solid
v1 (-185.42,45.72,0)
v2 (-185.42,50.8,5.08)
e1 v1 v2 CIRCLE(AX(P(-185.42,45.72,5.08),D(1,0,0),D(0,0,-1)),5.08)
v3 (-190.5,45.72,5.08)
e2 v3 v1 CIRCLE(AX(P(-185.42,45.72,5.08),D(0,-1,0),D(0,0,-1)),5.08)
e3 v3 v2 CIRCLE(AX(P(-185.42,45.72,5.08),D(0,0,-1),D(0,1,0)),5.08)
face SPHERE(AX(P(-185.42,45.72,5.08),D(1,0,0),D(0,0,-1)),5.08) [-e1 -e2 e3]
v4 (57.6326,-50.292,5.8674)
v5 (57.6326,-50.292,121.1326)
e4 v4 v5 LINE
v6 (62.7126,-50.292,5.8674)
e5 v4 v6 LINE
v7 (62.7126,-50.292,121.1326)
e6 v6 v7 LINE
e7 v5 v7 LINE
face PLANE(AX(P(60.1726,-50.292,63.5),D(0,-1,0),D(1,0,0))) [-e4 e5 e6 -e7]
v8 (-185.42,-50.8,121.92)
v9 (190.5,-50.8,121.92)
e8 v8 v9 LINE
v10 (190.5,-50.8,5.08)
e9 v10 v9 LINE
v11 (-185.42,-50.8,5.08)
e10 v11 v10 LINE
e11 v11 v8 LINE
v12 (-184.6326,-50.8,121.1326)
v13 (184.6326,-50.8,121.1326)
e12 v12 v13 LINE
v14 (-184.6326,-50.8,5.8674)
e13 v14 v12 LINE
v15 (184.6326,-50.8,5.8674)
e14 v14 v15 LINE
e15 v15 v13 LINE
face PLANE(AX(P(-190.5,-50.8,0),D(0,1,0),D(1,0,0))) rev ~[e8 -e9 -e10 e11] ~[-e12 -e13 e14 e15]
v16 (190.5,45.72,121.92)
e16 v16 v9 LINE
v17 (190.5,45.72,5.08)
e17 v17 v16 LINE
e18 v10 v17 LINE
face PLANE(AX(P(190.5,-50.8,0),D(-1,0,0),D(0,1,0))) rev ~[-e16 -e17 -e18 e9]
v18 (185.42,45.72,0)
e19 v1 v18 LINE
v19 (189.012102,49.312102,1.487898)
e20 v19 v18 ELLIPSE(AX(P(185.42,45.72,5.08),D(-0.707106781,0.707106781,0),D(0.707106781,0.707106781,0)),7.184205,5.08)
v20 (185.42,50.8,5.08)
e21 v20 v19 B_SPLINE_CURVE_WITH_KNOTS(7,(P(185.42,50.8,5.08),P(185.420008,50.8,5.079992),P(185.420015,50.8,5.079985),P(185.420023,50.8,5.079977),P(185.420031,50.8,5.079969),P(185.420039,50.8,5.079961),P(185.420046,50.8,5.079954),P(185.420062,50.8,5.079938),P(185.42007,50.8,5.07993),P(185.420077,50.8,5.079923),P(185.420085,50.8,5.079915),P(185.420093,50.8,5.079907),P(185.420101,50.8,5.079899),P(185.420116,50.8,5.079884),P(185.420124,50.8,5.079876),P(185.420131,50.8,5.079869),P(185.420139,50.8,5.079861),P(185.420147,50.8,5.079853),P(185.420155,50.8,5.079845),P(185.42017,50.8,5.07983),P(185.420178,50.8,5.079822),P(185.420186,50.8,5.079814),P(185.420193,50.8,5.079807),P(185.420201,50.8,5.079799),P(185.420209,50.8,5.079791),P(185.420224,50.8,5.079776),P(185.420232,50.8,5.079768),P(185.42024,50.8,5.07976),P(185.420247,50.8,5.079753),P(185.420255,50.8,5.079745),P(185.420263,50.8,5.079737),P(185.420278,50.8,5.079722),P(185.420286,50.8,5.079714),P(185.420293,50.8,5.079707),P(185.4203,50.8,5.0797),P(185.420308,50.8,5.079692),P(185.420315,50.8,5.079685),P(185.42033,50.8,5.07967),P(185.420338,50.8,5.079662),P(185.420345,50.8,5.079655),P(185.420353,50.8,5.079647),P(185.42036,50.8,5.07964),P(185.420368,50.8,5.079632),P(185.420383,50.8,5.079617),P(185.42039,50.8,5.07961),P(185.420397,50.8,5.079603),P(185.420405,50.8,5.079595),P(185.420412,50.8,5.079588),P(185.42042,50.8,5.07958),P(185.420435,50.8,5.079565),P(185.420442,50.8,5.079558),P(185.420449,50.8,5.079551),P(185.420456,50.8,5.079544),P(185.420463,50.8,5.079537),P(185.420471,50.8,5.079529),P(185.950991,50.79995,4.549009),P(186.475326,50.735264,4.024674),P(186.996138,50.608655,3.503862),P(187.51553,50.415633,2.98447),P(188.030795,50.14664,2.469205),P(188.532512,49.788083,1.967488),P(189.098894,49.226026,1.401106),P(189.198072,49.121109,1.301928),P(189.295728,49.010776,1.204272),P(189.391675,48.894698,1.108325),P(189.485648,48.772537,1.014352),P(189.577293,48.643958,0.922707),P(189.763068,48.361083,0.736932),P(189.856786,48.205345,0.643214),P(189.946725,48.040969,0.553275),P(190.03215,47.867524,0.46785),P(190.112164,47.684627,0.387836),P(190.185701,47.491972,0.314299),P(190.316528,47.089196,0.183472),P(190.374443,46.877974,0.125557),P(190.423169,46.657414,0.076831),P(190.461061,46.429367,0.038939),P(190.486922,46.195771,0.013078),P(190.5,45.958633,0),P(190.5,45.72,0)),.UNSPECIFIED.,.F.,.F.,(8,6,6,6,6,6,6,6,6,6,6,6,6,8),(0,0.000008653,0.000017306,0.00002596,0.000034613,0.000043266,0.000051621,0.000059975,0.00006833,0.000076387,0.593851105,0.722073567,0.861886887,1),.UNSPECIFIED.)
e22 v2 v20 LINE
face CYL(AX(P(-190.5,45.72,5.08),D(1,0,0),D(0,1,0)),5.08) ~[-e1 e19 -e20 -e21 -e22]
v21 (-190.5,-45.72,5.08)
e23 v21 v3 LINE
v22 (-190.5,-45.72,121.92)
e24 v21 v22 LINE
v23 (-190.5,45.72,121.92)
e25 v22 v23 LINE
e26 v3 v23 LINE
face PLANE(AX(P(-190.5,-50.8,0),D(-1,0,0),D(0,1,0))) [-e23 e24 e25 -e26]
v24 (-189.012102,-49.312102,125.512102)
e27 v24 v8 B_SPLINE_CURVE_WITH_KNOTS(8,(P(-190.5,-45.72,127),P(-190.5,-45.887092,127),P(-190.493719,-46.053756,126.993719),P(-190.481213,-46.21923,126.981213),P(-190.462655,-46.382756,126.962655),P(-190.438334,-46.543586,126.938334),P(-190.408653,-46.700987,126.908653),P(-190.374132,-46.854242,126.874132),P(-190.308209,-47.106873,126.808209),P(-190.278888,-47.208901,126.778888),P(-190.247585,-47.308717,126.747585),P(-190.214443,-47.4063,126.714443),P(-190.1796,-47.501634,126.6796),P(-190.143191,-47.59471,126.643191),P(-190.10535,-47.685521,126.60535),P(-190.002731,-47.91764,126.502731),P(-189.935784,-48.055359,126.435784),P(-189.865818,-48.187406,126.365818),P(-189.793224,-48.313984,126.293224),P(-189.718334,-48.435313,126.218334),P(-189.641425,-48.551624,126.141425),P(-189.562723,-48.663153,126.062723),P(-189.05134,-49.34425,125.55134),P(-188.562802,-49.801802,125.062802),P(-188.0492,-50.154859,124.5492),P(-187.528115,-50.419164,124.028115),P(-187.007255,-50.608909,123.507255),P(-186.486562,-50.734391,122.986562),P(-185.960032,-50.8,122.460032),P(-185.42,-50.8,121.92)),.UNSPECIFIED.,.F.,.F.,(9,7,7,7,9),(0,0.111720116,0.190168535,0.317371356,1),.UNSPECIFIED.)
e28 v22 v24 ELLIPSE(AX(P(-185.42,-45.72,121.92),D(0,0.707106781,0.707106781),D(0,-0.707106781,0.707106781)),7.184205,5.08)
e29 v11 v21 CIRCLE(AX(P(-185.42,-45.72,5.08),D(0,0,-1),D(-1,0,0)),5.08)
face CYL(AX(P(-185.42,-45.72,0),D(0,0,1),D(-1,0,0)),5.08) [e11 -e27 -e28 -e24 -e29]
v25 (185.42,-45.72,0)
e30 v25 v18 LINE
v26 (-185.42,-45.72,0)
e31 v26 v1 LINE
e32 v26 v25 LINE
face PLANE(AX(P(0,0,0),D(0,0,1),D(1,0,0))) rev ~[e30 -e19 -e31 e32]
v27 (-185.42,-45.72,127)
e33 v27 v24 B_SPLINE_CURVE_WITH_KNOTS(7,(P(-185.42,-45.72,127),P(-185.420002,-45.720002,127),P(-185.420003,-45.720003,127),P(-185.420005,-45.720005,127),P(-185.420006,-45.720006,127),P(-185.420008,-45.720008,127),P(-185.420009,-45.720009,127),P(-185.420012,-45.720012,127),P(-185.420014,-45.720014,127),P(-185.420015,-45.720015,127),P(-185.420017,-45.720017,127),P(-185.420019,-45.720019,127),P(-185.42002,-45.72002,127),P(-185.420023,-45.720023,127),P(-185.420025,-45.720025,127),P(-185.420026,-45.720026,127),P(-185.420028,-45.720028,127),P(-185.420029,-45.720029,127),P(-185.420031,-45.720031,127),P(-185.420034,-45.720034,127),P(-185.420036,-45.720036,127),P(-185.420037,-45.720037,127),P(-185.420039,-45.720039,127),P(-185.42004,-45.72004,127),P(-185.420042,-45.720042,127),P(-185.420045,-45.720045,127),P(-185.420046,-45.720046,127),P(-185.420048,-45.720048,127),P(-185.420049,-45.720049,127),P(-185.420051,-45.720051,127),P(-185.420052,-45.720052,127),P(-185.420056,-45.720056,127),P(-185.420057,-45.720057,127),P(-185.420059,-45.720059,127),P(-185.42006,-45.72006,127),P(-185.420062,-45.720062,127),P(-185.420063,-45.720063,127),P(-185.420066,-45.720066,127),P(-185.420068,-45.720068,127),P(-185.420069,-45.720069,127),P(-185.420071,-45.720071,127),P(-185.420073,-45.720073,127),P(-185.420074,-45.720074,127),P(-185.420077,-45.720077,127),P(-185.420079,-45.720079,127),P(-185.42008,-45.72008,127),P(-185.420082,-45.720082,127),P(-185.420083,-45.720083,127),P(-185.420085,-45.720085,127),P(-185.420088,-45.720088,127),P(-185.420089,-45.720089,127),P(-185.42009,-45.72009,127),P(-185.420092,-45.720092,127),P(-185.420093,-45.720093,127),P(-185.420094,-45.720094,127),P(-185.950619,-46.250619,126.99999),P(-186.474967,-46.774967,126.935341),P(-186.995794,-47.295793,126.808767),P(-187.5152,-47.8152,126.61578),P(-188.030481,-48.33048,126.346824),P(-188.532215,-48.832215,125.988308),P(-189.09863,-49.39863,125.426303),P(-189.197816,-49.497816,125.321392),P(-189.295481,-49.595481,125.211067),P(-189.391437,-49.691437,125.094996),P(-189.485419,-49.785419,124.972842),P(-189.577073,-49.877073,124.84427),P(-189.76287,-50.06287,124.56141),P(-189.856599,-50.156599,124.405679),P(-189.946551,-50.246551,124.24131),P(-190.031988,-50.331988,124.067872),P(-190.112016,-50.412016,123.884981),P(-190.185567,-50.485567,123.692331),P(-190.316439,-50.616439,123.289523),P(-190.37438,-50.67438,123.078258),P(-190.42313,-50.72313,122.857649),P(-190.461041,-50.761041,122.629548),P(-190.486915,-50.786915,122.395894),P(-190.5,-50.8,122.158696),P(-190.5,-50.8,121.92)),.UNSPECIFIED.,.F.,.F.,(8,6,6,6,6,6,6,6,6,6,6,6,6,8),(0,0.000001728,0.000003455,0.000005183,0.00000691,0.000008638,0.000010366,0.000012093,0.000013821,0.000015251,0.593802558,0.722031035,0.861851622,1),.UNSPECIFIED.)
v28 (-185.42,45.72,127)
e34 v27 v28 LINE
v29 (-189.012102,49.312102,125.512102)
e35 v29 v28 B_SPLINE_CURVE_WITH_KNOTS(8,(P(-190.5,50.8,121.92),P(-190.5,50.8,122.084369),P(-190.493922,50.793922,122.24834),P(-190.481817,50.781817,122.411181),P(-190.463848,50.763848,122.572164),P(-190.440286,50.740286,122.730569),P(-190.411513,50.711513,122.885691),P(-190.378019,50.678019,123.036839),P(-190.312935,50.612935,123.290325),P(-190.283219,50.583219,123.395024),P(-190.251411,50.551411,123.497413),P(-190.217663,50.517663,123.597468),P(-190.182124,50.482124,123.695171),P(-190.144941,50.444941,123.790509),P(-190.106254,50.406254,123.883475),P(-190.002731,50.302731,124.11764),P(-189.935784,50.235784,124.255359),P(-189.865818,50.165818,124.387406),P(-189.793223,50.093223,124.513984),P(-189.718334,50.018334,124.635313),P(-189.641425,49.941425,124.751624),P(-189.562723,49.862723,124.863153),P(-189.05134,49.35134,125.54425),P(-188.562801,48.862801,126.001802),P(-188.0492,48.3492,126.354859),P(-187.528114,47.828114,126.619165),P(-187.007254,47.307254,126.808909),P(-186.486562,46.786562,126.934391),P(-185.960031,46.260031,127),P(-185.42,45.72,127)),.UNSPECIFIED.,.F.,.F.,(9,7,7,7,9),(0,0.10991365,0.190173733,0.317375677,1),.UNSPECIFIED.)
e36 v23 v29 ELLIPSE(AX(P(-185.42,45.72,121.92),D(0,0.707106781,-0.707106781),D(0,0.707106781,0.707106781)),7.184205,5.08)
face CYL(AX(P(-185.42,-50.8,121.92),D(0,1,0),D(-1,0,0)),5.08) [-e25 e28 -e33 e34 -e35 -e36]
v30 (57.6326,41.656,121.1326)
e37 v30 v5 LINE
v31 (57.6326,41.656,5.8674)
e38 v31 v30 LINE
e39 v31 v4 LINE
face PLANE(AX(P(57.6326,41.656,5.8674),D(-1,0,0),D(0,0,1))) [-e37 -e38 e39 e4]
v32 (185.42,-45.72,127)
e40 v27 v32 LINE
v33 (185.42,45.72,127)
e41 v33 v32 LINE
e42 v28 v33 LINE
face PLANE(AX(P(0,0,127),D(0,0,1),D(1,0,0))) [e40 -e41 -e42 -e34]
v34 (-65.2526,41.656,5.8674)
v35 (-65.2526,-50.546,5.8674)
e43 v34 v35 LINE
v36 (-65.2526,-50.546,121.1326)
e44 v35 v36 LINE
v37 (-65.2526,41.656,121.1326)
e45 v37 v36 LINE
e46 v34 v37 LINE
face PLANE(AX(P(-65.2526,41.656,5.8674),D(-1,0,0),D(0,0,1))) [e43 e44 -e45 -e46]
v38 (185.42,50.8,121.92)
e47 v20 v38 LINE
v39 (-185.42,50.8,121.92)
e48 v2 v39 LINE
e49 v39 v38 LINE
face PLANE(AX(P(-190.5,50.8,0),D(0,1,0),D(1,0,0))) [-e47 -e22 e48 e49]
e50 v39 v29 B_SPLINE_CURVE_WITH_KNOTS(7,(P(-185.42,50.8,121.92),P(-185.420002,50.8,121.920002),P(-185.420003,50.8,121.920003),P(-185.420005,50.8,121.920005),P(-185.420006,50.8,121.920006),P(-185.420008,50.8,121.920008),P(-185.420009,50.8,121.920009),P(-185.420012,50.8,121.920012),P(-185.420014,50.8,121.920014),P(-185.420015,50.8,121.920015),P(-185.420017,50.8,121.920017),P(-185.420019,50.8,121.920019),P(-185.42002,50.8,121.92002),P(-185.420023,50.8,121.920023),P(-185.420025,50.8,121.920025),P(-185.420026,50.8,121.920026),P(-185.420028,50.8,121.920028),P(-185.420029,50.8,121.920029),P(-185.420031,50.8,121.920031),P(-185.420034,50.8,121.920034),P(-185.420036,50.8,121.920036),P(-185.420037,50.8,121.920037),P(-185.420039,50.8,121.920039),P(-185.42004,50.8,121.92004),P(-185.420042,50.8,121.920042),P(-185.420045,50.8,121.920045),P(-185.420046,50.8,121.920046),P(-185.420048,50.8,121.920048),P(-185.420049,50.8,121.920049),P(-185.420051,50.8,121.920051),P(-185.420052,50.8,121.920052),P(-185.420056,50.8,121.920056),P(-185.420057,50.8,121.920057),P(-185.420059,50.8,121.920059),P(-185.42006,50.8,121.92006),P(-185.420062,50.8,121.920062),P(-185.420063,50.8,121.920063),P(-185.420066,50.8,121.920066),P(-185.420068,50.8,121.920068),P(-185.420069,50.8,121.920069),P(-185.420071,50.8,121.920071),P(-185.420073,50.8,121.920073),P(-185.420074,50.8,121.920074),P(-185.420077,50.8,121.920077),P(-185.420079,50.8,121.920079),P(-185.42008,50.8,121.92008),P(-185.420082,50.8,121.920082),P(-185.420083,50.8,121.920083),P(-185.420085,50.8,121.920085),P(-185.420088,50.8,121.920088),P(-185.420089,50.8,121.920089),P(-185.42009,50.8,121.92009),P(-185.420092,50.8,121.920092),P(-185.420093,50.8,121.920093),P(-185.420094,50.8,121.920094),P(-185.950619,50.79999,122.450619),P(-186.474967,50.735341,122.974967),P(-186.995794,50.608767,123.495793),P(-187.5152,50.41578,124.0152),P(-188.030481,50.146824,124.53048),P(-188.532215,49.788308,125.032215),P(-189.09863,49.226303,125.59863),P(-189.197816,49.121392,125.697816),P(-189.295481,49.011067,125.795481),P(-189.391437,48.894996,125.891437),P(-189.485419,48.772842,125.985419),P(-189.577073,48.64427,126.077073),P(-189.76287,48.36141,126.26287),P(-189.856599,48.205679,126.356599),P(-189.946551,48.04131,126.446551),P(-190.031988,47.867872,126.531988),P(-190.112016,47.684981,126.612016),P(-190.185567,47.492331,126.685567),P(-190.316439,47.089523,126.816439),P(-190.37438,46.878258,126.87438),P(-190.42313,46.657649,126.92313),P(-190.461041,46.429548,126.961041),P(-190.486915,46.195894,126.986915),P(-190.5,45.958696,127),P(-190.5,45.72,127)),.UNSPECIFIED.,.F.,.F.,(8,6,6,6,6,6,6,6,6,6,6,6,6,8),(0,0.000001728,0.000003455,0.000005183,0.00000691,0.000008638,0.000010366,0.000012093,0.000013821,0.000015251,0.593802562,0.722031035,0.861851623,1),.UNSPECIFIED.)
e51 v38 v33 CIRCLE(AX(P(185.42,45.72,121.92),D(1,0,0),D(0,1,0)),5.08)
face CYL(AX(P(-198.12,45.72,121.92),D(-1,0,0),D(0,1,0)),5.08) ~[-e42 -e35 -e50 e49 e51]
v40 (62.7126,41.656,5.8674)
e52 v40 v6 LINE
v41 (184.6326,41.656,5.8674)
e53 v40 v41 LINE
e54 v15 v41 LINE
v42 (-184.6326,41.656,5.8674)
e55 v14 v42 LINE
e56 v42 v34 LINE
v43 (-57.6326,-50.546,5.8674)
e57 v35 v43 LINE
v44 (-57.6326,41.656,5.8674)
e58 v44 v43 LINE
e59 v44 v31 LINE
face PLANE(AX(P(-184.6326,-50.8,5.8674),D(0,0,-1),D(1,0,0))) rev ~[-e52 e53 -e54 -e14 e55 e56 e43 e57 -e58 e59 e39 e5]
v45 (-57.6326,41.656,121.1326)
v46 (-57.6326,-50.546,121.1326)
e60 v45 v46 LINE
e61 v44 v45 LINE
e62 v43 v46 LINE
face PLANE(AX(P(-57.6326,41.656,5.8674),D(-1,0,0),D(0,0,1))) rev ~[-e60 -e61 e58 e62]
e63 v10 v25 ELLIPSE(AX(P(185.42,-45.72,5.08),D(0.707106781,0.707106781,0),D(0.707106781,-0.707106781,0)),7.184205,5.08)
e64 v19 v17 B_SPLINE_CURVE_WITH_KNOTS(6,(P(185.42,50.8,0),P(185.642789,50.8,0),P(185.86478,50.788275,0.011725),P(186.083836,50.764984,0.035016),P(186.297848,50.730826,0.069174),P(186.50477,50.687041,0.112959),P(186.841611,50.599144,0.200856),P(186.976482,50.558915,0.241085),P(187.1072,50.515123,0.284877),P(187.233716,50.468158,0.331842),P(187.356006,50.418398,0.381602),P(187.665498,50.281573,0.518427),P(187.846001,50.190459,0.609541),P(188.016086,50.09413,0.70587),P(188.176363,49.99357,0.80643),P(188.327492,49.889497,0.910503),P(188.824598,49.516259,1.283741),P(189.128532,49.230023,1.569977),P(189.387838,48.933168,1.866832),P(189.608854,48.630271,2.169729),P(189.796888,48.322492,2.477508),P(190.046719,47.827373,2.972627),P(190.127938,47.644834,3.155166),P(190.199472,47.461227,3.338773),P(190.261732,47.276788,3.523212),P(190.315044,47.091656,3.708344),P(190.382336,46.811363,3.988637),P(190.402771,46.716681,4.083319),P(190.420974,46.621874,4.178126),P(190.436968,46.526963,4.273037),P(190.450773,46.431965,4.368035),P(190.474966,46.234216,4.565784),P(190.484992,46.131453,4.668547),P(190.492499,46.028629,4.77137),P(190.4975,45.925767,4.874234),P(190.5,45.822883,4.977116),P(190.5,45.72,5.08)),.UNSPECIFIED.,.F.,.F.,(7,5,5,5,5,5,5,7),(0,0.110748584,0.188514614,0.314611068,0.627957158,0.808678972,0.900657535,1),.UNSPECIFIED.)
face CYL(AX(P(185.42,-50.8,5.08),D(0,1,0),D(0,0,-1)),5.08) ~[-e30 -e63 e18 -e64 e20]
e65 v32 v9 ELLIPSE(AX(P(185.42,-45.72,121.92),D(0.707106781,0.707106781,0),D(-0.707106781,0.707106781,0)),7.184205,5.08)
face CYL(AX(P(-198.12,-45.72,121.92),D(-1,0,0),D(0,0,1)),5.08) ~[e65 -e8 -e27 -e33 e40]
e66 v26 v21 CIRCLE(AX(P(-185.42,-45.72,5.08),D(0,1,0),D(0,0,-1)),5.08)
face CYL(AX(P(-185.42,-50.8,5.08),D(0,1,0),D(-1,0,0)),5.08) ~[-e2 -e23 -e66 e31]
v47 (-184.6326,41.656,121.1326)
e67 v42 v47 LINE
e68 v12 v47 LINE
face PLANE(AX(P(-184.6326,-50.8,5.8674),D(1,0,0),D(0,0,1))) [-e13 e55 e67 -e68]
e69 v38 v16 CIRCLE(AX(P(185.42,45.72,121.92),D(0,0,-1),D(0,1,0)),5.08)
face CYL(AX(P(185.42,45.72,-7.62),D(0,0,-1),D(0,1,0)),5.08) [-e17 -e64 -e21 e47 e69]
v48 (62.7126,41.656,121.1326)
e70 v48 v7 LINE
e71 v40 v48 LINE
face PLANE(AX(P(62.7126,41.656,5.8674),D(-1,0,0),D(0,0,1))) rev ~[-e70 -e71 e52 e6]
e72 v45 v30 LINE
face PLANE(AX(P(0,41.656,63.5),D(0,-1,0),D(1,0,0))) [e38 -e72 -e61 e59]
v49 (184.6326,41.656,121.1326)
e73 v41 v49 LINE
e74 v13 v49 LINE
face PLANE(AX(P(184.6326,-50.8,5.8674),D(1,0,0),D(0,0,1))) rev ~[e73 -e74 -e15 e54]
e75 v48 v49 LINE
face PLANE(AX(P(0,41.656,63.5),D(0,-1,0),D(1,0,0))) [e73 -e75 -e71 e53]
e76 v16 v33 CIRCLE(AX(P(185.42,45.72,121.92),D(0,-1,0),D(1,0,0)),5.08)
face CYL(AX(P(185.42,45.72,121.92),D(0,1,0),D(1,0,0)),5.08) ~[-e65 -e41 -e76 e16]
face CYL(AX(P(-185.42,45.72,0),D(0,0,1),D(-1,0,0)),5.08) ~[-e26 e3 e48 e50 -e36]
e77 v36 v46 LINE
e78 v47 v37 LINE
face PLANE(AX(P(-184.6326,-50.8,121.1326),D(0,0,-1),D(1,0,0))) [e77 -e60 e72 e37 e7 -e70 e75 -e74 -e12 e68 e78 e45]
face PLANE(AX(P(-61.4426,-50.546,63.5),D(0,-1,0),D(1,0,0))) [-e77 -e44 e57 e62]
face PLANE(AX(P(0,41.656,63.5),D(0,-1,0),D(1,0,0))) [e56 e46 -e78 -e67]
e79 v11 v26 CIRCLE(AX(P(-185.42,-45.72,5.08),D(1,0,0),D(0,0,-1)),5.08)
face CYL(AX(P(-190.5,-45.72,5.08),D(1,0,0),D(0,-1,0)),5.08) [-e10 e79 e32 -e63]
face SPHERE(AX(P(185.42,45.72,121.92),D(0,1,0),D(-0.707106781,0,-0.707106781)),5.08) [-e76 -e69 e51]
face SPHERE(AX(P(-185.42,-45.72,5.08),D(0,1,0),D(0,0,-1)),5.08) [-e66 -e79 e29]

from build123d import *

# Parameters (mm, degrees)
F0_W         = 381
F0_H         = 101.6
F1_DEPTH     = 127
F2_W         = 369.2652
F2_H         = 115.2652
F3_DEPTH     = 92.456
F4_W         = 7.62
F4_H         = 115.2652
F5_DEPTH     = 92.202
F6_W         = 5.08
F6_H         = 115.2652
F7_DEPTH     = 91.948
F8_R         = 5.08
F9_T1_DEPTH  = 383.54
F9_T3_DEPTH  = 109.22
F9_T5_DEPTH  = 401.32
F9_T7_DEPTH  = 129.54
F9_S11_W     = 5.1816
F9_S11_H     = 5.1816
F9_T12_DEPTH = 5.1816


# Not quite as in the source:
# - a fillet or chamfer that OpenCascade refuses, or shapes differently, is made with other operations: its cross-section is extruded or revolved along the edge and cut away or added


with BuildPart() as f1:
    # F0 (on Top) → F1 (new body)
    with BuildSketch(Plane.XY):
        Rectangle(F0_W, F0_H)
    extrude(amount=F1_DEPTH)

    # F2 (on face) → F3 (cut)
    with BuildSketch(Plane.XZ.offset(50.8)):
        with Locations((0, 63.5)):
            Rectangle(F2_W, F2_H)
    extrude(amount=-F3_DEPTH, mode=Mode.SUBTRACT)

    # F4 (on face) → F5 (join)
    with BuildSketch(Plane.XZ.offset(-41.656)):
        with Locations((-61.4426, 63.5)):
            Rectangle(F4_W, F4_H)
    extrude(amount=F5_DEPTH)

    # F6 (on face) → F7 (join)
    with BuildSketch(Plane.XZ.offset(-41.656)):
        with Locations((60.1726, 63.5)):
            Rectangle(F6_W, F6_H)
    extrude(amount=F7_DEPTH)

    # F8
    f8_edges = [f1.edges().sort_by_distance(p)[0] for p in [
        (0, 50.8, 0),
        (-190.5, 0, 0),
        (0, -50.8, 0),
        (190.5, 0, 0),
        (-190.5, 50.8, 63.5),
        (-190.5, -50.8, 63.5),
        (-190.5, 0, 127),
    ]]
    fillet(f8_edges, radius=F8_R)

    # F9: fillet of radius 5.08 on 7 edges, made by hand

    # F9_s2 → F9_t1 (cut)
    with BuildSketch(Plane.YZ.offset(-198.12)):
        with BuildLine():
            ThreePointArc((50.8, 121.92), (49.3121024484, 125.5121024484), (45.72, 127))
            Line((45.72, 127), (50.8, 127))
            Line((50.8, 127), (50.8, 121.92))
        make_face()
    extrude(amount=F9_T1_DEPTH, mode=Mode.SUBTRACT)

    # F9_s4 → F9_t3 (cut)
    with BuildSketch(Plane.XZ.offset(-45.72)):
        with BuildLine():
            ThreePointArc((190.5, 121.92), (189.0121024484, 125.5121024484), (185.42, 127))
            Line((185.42, 127), (190.5, 127))
            Line((190.5, 127), (190.5, 121.92))
        make_face()
    extrude(amount=F9_T3_DEPTH, mode=Mode.SUBTRACT)

    # F9_s6 → F9_t5 (cut)
    with BuildSketch(Plane.YZ.offset(-198.12)):
        with BuildLine():
            ThreePointArc((-45.72, 127), (-49.3121024484, 125.5121024484), (-50.8, 121.92))
            Line((-50.8, 121.92), (-50.8, 127))
            Line((-50.8, 127), (-45.72, 127))
        make_face()
    extrude(amount=F9_T5_DEPTH, mode=Mode.SUBTRACT)

    # F9_s8 → F9_t7 (cut)
    with BuildSketch(Plane.XY.offset(-7.62)):
        with BuildLine():
            ThreePointArc((185.42, 50.8), (189.0121024484, 49.3121024484), (190.5, 45.72))
            Line((190.5, 45.72), (190.5, 50.8))
            Line((190.5, 50.8), (185.42, 50.8))
        make_face()
    extrude(amount=F9_T7_DEPTH, mode=Mode.SUBTRACT)


with BuildPart() as f9_tool10:
    # F9_s11 → F9_t12 (new body)
    with BuildSketch(Plane.XZ.offset(-45.72)):
        with Locations((188.0108, 124.5108)):
            Rectangle(F9_S11_W, F9_S11_H)
    extrude(amount=-F9_T12_DEPTH)

    # F9_s13 → F9_t14 (revolve, cut)
    with BuildSketch(Plane(origin=(185.42, 45.72, 121.92), x_dir=(-0.7071067812, 0, -0.7071067812), z_dir=(0.7071067812, 0, -0.7071067812))):
        with BuildLine():
            ThreePointArc((0, -5.08), (5.08, 0), (0, 5.08))
            Line((0, 5.08), (0, -5.08))
        make_face()
    revolve(axis=Axis((185.42, 45.72, 121.92), (0, 1, 0)), mode=Mode.SUBTRACT)


with BuildPart() as f1_1:
    add(f1.part)

    # F9_t9: cut F9_tool10
    add(f9_tool10.part, mode=Mode.SUBTRACT)


solid = f1_1.part
